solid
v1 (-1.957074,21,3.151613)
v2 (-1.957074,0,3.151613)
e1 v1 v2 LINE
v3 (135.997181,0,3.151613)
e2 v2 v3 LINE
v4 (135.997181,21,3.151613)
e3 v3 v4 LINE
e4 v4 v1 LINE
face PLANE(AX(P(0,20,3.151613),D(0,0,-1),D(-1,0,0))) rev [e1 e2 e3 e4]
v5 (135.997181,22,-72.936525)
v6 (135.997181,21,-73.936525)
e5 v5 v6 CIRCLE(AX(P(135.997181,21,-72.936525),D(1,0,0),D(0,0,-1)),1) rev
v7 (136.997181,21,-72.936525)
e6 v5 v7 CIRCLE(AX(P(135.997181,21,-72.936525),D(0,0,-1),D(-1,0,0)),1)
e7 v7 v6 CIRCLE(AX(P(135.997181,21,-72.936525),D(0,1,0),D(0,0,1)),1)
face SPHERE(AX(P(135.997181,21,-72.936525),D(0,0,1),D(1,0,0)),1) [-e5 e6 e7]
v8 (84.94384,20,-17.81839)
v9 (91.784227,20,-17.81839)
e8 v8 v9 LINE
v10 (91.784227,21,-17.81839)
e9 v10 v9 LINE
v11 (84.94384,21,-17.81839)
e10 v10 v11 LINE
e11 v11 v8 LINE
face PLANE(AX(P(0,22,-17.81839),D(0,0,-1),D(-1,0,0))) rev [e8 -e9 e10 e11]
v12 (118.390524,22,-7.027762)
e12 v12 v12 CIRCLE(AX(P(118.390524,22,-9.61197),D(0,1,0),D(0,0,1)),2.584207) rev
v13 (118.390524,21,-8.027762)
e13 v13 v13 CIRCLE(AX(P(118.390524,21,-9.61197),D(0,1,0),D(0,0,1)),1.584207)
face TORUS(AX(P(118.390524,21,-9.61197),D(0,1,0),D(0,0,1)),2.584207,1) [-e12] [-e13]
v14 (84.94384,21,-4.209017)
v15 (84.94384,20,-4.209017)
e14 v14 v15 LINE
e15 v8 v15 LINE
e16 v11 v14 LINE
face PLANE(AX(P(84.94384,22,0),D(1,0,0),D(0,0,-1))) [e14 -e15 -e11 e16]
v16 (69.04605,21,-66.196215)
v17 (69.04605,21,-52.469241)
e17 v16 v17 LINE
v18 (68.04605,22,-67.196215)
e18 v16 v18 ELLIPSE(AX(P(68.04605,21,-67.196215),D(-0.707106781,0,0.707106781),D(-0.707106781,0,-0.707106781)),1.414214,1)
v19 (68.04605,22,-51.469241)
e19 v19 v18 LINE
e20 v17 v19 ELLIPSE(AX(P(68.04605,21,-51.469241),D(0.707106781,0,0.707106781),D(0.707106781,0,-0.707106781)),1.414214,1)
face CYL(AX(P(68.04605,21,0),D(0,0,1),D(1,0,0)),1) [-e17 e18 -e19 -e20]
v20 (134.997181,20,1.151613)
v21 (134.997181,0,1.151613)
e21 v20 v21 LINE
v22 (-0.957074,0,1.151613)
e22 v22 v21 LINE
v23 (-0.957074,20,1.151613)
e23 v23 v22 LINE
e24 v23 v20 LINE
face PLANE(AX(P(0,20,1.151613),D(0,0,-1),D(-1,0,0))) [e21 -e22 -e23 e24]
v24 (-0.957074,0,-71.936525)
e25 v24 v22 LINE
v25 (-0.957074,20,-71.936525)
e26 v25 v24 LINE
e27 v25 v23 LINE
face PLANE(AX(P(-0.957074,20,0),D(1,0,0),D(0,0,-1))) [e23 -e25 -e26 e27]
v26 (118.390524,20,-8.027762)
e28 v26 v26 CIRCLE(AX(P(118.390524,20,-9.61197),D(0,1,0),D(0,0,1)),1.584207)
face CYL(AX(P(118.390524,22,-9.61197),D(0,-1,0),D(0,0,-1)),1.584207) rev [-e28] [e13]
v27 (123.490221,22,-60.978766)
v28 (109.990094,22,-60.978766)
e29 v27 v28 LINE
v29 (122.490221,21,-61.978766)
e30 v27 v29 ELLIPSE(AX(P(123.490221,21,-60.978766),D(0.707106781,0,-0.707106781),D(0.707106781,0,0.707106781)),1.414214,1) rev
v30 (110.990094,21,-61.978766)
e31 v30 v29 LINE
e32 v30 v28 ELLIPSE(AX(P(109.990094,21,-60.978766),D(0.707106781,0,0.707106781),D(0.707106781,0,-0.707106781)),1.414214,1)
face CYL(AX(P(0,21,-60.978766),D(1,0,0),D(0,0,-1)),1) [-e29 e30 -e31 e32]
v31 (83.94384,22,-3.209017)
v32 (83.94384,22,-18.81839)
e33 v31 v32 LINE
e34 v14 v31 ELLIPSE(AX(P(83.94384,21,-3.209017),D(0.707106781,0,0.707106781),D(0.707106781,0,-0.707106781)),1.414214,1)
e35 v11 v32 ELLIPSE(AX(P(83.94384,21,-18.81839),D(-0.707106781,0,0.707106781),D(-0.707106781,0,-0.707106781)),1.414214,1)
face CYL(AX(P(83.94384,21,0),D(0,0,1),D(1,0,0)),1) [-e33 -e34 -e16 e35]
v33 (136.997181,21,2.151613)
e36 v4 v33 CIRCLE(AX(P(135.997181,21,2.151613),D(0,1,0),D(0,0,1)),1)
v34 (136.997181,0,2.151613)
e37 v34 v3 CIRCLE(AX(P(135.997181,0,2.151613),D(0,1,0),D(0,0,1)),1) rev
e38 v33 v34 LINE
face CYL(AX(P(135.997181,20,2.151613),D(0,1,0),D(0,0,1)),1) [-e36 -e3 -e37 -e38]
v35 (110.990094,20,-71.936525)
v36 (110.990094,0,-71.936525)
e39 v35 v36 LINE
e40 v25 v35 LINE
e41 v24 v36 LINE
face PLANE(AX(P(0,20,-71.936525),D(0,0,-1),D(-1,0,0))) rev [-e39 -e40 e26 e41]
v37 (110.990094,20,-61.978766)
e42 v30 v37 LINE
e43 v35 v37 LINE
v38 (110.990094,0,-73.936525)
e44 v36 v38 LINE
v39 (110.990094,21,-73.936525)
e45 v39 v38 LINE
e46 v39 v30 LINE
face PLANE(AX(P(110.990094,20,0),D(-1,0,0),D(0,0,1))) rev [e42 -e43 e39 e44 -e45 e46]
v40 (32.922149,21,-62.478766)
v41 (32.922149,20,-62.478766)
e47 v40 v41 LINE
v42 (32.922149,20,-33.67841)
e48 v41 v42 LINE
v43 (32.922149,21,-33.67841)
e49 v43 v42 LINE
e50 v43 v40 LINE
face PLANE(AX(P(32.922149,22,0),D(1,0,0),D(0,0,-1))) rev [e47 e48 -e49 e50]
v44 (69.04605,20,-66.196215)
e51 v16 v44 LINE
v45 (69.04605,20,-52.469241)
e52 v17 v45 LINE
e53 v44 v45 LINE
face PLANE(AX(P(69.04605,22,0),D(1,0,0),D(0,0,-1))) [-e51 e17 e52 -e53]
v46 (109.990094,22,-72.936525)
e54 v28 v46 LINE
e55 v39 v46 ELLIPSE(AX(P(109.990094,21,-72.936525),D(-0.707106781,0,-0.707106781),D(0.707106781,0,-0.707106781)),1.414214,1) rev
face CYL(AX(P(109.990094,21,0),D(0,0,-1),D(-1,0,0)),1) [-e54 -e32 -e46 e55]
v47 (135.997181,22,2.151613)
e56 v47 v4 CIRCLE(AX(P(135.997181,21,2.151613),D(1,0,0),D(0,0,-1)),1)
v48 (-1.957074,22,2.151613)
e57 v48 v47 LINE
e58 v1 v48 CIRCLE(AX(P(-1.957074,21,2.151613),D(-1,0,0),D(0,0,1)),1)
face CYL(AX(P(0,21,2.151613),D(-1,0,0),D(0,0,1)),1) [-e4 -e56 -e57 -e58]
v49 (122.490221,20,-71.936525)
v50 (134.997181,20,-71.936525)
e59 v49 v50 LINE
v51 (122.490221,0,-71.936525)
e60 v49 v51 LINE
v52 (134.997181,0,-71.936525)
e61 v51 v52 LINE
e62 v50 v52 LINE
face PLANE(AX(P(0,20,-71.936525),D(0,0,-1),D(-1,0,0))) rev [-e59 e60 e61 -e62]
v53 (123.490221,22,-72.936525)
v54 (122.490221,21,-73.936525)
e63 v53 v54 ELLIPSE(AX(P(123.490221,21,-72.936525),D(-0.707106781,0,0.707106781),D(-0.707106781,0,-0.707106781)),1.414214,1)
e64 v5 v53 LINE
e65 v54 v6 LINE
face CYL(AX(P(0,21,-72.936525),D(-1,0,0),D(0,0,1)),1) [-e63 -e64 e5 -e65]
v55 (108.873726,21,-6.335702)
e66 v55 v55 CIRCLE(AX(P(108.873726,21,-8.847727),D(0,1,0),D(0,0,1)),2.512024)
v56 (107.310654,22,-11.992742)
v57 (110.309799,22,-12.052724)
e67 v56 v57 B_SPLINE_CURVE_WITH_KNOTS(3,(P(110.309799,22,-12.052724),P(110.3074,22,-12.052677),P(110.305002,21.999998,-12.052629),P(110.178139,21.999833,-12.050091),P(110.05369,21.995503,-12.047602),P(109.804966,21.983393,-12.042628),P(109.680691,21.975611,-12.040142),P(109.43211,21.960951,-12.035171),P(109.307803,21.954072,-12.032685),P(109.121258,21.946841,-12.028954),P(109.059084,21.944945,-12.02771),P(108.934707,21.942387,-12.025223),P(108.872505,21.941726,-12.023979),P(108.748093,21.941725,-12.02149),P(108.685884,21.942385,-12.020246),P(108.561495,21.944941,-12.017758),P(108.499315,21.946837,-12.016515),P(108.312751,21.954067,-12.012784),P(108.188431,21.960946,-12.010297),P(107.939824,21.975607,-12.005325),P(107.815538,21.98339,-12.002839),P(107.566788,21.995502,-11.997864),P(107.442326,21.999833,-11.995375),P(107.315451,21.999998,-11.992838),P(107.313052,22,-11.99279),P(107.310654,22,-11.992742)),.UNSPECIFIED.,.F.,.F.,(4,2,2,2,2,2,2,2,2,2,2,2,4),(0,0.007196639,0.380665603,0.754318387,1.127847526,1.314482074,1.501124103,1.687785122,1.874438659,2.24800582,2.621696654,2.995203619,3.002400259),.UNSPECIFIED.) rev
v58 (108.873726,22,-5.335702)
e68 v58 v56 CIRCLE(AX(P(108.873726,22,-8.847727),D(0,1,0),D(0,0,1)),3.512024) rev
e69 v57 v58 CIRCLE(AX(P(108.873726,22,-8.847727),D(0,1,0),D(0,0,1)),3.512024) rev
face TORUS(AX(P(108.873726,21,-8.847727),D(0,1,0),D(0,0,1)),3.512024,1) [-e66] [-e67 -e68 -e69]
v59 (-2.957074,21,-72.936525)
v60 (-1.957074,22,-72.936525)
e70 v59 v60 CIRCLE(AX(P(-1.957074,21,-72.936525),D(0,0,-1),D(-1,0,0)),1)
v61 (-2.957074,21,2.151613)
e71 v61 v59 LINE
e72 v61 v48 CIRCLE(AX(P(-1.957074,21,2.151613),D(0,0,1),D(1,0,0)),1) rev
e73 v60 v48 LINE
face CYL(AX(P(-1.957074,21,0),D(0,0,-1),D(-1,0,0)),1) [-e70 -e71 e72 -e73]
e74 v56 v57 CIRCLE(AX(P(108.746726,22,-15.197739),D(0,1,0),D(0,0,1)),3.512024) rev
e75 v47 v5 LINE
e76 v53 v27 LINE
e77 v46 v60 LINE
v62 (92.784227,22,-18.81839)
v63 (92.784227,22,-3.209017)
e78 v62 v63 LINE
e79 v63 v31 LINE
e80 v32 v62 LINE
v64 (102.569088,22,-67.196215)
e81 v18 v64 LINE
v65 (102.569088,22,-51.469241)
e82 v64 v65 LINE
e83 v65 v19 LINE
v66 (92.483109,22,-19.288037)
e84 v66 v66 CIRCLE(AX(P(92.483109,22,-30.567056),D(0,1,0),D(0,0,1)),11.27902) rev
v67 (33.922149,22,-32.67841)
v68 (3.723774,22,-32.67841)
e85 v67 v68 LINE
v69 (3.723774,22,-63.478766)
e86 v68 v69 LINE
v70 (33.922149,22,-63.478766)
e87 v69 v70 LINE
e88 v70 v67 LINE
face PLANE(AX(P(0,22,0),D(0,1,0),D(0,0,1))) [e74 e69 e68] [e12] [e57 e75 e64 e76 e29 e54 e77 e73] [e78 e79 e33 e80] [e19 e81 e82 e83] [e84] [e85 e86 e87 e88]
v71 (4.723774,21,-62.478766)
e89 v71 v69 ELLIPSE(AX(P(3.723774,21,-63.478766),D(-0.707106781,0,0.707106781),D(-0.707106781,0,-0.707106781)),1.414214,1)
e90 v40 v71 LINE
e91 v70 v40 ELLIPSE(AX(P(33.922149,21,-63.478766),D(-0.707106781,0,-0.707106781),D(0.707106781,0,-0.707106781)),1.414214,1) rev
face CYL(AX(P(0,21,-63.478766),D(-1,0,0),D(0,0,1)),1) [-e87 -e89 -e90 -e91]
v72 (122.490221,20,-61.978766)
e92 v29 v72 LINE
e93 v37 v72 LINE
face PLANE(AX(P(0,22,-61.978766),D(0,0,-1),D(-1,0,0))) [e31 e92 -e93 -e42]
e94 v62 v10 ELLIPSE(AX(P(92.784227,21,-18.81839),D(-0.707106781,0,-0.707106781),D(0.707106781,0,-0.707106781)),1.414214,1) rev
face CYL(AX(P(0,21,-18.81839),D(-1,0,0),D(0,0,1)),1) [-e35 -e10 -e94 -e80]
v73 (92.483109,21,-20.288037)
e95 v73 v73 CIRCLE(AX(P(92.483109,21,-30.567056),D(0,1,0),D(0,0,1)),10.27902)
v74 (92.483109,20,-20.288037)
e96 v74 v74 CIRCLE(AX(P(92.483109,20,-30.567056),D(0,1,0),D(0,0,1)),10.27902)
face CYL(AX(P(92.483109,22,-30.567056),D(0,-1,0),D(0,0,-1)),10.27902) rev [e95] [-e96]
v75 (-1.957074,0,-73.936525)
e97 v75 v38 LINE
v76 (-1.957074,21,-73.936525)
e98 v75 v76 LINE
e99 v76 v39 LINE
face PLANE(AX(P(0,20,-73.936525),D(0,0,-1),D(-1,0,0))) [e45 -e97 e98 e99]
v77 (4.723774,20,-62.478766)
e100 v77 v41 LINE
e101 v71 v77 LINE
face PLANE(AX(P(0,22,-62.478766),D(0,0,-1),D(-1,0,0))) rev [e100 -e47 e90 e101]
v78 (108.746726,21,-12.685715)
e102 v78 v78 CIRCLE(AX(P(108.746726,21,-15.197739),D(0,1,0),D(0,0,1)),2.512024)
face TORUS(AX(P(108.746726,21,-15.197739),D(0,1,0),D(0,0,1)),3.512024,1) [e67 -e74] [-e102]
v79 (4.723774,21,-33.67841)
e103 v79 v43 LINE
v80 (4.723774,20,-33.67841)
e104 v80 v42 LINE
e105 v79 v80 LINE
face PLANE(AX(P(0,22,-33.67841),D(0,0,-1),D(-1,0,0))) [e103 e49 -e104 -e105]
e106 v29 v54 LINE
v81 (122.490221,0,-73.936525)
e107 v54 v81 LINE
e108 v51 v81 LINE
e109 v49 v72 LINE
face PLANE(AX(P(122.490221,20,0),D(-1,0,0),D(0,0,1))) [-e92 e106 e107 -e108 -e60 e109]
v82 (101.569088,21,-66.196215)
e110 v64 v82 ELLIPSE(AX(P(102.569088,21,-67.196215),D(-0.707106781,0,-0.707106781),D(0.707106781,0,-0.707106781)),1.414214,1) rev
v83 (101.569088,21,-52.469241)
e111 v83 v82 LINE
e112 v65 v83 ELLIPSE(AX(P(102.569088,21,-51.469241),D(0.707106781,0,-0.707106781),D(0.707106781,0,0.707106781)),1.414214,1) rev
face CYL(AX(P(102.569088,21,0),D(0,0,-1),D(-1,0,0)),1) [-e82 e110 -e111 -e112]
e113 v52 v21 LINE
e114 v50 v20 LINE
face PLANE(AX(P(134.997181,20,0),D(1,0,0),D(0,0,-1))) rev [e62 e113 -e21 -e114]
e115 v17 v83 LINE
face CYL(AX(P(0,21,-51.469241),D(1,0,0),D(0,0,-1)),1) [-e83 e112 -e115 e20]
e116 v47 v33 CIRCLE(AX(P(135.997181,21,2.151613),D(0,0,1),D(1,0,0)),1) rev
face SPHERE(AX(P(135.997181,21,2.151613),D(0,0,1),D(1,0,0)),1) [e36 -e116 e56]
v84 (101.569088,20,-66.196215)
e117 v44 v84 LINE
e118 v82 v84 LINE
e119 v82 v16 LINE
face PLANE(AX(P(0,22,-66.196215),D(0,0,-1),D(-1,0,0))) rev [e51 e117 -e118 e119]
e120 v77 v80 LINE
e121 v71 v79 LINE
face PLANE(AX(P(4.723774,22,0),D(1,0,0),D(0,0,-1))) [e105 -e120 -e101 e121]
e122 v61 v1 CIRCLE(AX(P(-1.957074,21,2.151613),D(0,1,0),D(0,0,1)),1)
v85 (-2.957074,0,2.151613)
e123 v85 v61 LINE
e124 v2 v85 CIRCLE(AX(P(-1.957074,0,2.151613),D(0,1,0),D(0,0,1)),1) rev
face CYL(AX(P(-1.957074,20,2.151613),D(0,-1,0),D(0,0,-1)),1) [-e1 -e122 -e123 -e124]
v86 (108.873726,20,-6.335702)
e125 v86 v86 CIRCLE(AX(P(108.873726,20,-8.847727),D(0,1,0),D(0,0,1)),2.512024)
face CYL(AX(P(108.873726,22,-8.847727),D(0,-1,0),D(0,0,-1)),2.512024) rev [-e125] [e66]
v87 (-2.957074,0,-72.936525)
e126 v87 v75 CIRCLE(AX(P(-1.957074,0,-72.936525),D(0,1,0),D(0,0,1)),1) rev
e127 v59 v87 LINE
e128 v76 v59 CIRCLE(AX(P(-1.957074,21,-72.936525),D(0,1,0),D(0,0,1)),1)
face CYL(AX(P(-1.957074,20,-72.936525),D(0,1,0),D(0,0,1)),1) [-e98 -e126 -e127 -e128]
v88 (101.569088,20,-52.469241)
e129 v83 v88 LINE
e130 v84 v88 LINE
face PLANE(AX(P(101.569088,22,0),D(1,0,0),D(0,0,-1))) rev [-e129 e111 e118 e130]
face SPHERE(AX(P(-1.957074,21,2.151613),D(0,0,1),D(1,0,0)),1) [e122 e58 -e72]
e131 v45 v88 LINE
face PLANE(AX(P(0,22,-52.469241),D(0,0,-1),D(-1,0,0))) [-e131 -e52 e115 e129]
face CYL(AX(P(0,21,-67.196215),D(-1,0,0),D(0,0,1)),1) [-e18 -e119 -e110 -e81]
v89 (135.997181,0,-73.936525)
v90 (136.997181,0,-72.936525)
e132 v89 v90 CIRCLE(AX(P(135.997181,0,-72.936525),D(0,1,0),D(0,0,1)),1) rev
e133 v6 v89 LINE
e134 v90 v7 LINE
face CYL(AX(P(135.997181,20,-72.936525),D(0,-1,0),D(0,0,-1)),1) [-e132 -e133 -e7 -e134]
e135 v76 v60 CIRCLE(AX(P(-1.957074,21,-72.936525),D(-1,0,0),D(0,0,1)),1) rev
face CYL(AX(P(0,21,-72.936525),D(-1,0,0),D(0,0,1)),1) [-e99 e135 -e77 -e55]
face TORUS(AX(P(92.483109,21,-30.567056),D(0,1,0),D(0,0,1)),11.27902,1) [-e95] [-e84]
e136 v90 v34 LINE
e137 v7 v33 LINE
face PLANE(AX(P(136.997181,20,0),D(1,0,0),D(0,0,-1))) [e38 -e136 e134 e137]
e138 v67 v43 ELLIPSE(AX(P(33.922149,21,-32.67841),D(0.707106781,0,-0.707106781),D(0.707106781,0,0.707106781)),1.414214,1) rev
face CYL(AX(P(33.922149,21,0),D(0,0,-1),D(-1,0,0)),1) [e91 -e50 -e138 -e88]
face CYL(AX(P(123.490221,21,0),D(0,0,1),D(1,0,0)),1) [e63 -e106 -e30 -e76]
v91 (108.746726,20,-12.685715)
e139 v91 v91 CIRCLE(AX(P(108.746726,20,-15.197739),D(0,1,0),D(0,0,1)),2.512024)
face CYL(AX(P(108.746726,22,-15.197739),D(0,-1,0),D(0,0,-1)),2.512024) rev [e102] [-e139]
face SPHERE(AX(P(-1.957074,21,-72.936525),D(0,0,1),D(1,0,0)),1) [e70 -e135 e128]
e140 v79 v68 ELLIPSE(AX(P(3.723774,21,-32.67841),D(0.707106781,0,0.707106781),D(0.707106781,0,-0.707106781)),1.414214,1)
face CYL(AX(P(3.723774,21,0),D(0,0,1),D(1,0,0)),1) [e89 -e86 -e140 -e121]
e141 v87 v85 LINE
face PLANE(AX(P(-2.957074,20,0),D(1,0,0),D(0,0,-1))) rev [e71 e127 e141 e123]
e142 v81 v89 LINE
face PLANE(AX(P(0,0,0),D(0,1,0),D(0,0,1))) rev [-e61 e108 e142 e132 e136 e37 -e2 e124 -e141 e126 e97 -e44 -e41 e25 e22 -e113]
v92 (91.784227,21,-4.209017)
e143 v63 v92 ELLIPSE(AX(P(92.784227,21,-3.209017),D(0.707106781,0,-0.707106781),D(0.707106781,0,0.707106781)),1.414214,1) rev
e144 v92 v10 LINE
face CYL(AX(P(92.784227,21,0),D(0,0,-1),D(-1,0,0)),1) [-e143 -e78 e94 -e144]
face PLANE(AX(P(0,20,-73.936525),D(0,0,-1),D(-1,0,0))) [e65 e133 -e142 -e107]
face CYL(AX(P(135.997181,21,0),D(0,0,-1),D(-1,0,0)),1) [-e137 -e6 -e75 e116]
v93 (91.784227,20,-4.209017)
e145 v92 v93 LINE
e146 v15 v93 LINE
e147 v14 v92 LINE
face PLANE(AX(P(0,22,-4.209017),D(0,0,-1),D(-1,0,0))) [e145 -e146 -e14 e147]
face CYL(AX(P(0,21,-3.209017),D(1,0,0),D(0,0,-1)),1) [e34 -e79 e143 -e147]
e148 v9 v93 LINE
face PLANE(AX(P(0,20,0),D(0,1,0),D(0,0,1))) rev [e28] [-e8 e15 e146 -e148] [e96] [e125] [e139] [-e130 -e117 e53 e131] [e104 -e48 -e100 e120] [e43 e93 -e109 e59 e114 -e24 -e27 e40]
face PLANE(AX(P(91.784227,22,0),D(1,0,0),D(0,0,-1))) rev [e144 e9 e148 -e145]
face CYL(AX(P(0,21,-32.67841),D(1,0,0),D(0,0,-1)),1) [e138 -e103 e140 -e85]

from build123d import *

# Parameters (mm, degrees)
BOSS_EXTRUDE3_DEPTH = 20
SKETCH5_W           = 6.84038608
SKETCH5_H           = 13.609372619
SKETCH5_R           = 2.512024295
SKETCH5_R_2         = 1.584207127
SKETCH5_R_3         = 10.279019558
SKETCH5_W_2         = 28.198374396
SKETCH5_H_2         = 28.800355601
SKETCH5_W_3         = 32.523037846
SKETCH5_H_3         = 13.726974854
BOSS_EXTRUDE4_DEPTH = 2
FILLET3_R           = 1


with BuildPart() as part:
    # Sketch2 → Boss-Extrude3 (new body)
    with BuildSketch(Plane(origin=(0, 0, 0), x_dir=(1, 0, 0), z_dir=(0, 1, 0))):
        Polygon((110.99009398, 73.936525273), (-2.957073914, 73.936525273), (-2.957073914, -3.151612903), (136.997180594, -3.151612903), (136.997180594, 73.936525273), (122.49022098, 73.936525273), (122.49022098, 71.936525273), (134.997180594, 71.936525273), (134.997180594, -1.151612903), (-0.957073914, -1.151612903), (-0.957073914, 71.936525273), (110.99009398, 71.936525273), align=None)
    extrude(amount=BOSS_EXTRUDE3_DEPTH)

    # Sketch5 → Boss-Extrude4 (add)
    # profile 1 of 2: a face of its own
    with BuildSketch(Plane(origin=(0, 20, 0), x_dir=(1, 0, 0), z_dir=(0, 1, 0))):
        Polygon((110.99009398, 61.978765558), (110.99009398, 71.936525273), (-0.957073914, 71.936525273), (-0.957073914, -1.151612903), (134.997180594, -1.151612903), (134.997180594, 71.936525273), (122.49022098, 71.936525273), (122.49022098, 61.978765558), align=None)
        with Locations((88.364033528, 11.013703328)):
            Rectangle(SKETCH5_W, SKETCH5_H, mode=Mode.SUBTRACT)
        with Locations(Location((108.873726401, 8.847726695, 0), (0, 0, 270))):
            Circle(SKETCH5_R, mode=Mode.SUBTRACT)
        with Locations(Location((118.390524318, 9.61196952, 0), (0, 0, 270))):
            Circle(SKETCH5_R_2, mode=Mode.SUBTRACT)
        with Locations(Location((108.746726147, 15.197739395, 0), (0, 0, 270))):
            Circle(SKETCH5_R, mode=Mode.SUBTRACT)
        with Locations(Location((92.483108966, 30.567056134, 0), (0, 0, 270))):
            Circle(SKETCH5_R_3, mode=Mode.SUBTRACT)
        with Locations((18.822961646, 48.078587758)):
            Rectangle(SKETCH5_W_2, SKETCH5_H_2, mode=Mode.SUBTRACT)
        with Locations((85.307569215, 59.332727965)):
            Rectangle(SKETCH5_W_3, SKETCH5_H_3, mode=Mode.SUBTRACT)
    # profile 2 of 2: a face of its own
    with BuildSketch(Plane(origin=(0, 20, 0), x_dir=(1, 0, 0), z_dir=(0, 1, 0))):
        Polygon((136.997180594, 73.936525273), (122.49022098, 73.936525273), (122.49022098, 71.936525273), (134.997180594, 71.936525273), (134.997180594, -1.151612903), (-0.957073914, -1.151612903), (-0.957073914, 71.936525273), (110.99009398, 71.936525273), (110.99009398, 73.936525273), (-2.957073914, 73.936525273), (-2.957073914, -3.151612903), (136.997180594, -3.151612903), align=None)
    extrude(amount=BOSS_EXTRUDE4_DEPTH)

    # Fillet3
    # the kernel refuses this fillet: 1 mm, written as the material it takes off along each edge
    with BuildSketch(Plane(origin=(135.997180594, 21, -72.936525273), x_dir=(1, 0, 0), z_dir=(0, 0, -1))) as fillet3_piece_1_section:
        Polygon((0, 0), (FILLET3_R, 0), (FILLET3_R, -FILLET3_R), (0, -FILLET3_R), align=None)
    fillet3_piece_1 = extrude(amount=FILLET3_R, mode=Mode.PRIVATE)
    fillet3_piece_1 = fillet3_piece_1 - Plane(origin=(135.997180594, 21, -72.936525273), x_dir=(-0.7071067811865475, -0.7071067811865475, 0), z_dir=(0, 0, -1)) * Sphere(FILLET3_R, mode=Mode.PRIVATE)
    add(fillet3_piece_1, mode=Mode.SUBTRACT)
    with BuildSketch(Plane(origin=(135.997180594, 21, 2.151612903), x_dir=(0, 0, 1), z_dir=(1, 0, 0))) as fillet3_piece_2_section:
        Polygon((0, 0), (FILLET3_R, 0), (FILLET3_R, -FILLET3_R), (0, -FILLET3_R), align=None)
    fillet3_piece_2 = extrude(amount=FILLET3_R, mode=Mode.PRIVATE)
    fillet3_piece_2 = fillet3_piece_2 - Plane(origin=(135.997180594, 21, 2.151612903), x_dir=(0, -0.7071067811865475, -0.7071067811865475), z_dir=(1, 0, 0)) * Sphere(FILLET3_R, mode=Mode.PRIVATE)
    add(fillet3_piece_2, mode=Mode.SUBTRACT)
    with BuildSketch(Plane(origin=(-1.957073914, 21, 2.151612903), x_dir=(-1, 0, 0), z_dir=(0, 0, 1))) as fillet3_piece_3_section:
        Polygon((0, 0), (FILLET3_R, 0), (FILLET3_R, -FILLET3_R), (0, -FILLET3_R), align=None)
    fillet3_piece_3 = extrude(amount=FILLET3_R, mode=Mode.PRIVATE)
    fillet3_piece_3 = fillet3_piece_3 - Plane(origin=(-1.957073914, 21, 2.151612903), x_dir=(0.7071067811865475, -0.7071067811865475, 0), z_dir=(0, 0, 1)) * Sphere(FILLET3_R, mode=Mode.PRIVATE)
    add(fillet3_piece_3, mode=Mode.SUBTRACT)
    with BuildSketch(Plane(origin=(-1.957073914, 21, -72.936525273), x_dir=(-1, 0, 0), z_dir=(0, 0, -1))) as fillet3_piece_4_section:
        Polygon((0, 0), (FILLET3_R, 0), (FILLET3_R, FILLET3_R), (0, FILLET3_R), align=None)
    fillet3_piece_4 = extrude(amount=FILLET3_R, mode=Mode.PRIVATE)
    fillet3_piece_4 = fillet3_piece_4 - Plane(origin=(-1.957073914, 21, -72.936525273), x_dir=(0.7071067811865475, -0.7071067811865475, 0), z_dir=(0, 0, -1)) * Sphere(FILLET3_R, mode=Mode.PRIVATE)
    add(fillet3_piece_4, mode=Mode.SUBTRACT)
    with BuildSketch(Plane(origin=(136.997180594, -2.5, -73.936525273), x_dir=(-1, 0, 0), z_dir=(0, 1, 0)), Plane(origin=(136.997180594, -2.5, 3.151612903), x_dir=(0, 0, -1), z_dir=(0, 1, 0)), Plane(origin=(-2.957073914, -2.5, 3.151612903), x_dir=(1, 0, 0), z_dir=(0, 1, 0))) as fillet3_piece_5:
        with BuildLine():
            CenterArc((FILLET3_R, FILLET3_R), FILLET3_R, 180, 90)
            Line((0, FILLET3_R), (0, 0))
            Line((0, 0), (FILLET3_R, 0))
        make_face()
    extrude(amount=23.5, mode=Mode.SUBTRACT)
    with BuildSketch(Plane(origin=(-2.957073914, -2.5, -73.936525273), x_dir=(1, 0, 0), z_dir=(0, 1, 0))) as fillet3_piece_6:
        with BuildLine():
            CenterArc((FILLET3_R, -FILLET3_R), FILLET3_R, 90, 90)
            Line((0, -FILLET3_R), (0, 0))
            Line((0, 0), (FILLET3_R, 0))
        make_face()
    extrude(amount=23.5, mode=Mode.SUBTRACT)
    with BuildSketch(Plane(origin=(69.046050292, 22, -52.469240538), x_dir=(0, -1, 0), z_dir=(0, 0, -1)), Plane(origin=(101.569088138, 22, -66.196215392), x_dir=(0, -1, 0), z_dir=(0, 0, 1))) as fillet3_piece_7:
        with BuildLine():
            CenterArc((FILLET3_R, FILLET3_R), FILLET3_R, 180, 90)
            Line((0, FILLET3_R), (0, 0))
            Line((0, 0), (FILLET3_R, 0))
        make_face()
    extrude(amount=13.726974854, mode=Mode.SUBTRACT)
    with BuildSketch(Plane(origin=(4.723774448, 22, -33.678409957), x_dir=(0, -1, 0), z_dir=(0, 0, -1)), Plane(origin=(32.922148844, 22, -62.478765558), x_dir=(0, -1, 0), z_dir=(0, 0, 1))) as fillet3_piece_8:
        with BuildLine():
            CenterArc((FILLET3_R, FILLET3_R), FILLET3_R, 180, 90)
            Line((0, FILLET3_R), (0, 0))
            Line((0, 0), (FILLET3_R, 0))
        make_face()
    extrude(amount=28.800355601, mode=Mode.SUBTRACT)
    with BuildSketch(Plane(origin=(84.943840488, 22, -4.209017018), x_dir=(0, -1, 0), z_dir=(0, 0, -1)), Plane(origin=(91.784226568, 22, -17.818389637), x_dir=(0, -1, 0), z_dir=(0, 0, 1))) as fillet3_piece_9:
        with BuildLine():
            CenterArc((FILLET3_R, FILLET3_R), FILLET3_R, 180, 90)
            Line((0, FILLET3_R), (0, 0))
            Line((0, 0), (FILLET3_R, 0))
        make_face()
    extrude(amount=13.609372619, mode=Mode.SUBTRACT)
    with BuildSketch(Plane(origin=(110.99009398, 22, -76.436525273), x_dir=(-1, 0, 0), z_dir=(0, 0, 1)), Plane(origin=(122.49022098, 22, -76.436525273), x_dir=(0, -1, 0), z_dir=(0, 0, 1))) as fillet3_piece_10:
        with BuildLine():
            CenterArc((FILLET3_R, FILLET3_R), FILLET3_R, 180, 90)
            Line((0, FILLET3_R), (0, 0))
            Line((0, 0), (FILLET3_R, 0))
        make_face()
    extrude(amount=14.457759716, mode=Mode.SUBTRACT)
    with BuildSketch(Plane(origin=(32.922148844, 22, -33.678409957), x_dir=(0, -1, 0), z_dir=(-1, 0, 0)), Plane(origin=(4.723774448, 22, -62.478765558), x_dir=(0, -1, 0), z_dir=(1, 0, 0))) as fillet3_piece_11:
        with BuildLine():
            CenterArc((FILLET3_R, FILLET3_R), FILLET3_R, 180, 90)
            Line((0, FILLET3_R), (0, 0))
            Line((0, 0), (FILLET3_R, 0))
        make_face()
    extrude(amount=28.198374397, mode=Mode.SUBTRACT)
    with BuildSketch(Plane(origin=(91.784226568, 22, -4.209017018), x_dir=(0, -1, 0), z_dir=(-1, 0, 0)), Plane(origin=(84.943840488, 22, -17.818389637), x_dir=(0, -1, 0), z_dir=(1, 0, 0))) as fillet3_piece_12:
        with BuildLine():
            CenterArc((FILLET3_R, FILLET3_R), FILLET3_R, 180, 90)
            Line((0, FILLET3_R), (0, 0))
            Line((0, 0), (FILLET3_R, 0))
        make_face()
    extrude(amount=6.840386081, mode=Mode.SUBTRACT)
    with BuildSketch(Plane(origin=(118.390524318, 22, -9.61196952), x_dir=(0, 0, 1), z_dir=(-1, 0, 0))) as fillet3_piece_13:
        with BuildLine():
            CenterArc((1.584207127 + FILLET3_R, -FILLET3_R), FILLET3_R, 90, 90)
            Line((1.584207127 + FILLET3_R, 0), (1.584207127, 0))
            Line((1.584207127, 0), (1.584207127, -FILLET3_R))
        make_face()
    revolve(axis=Axis((118.390524318, 22, -9.61196952), (0, 1, 0)), mode=Mode.SUBTRACT)
    with BuildSketch(Plane(origin=(92.483108966, 22, -30.567056134), x_dir=(0, 0, 1), z_dir=(-1, 0, 0))) as fillet3_piece_14:
        with BuildLine():
            CenterArc((10.279019558 + FILLET3_R, -FILLET3_R), FILLET3_R, 90, 90)
            Line((10.279019558 + FILLET3_R, 0), (10.279019558, 0))
            Line((10.279019558, 0), (10.279019558, -FILLET3_R))
        make_face()
    revolve(axis=Axis((92.483108966, 22, -30.567056134), (0, 1, 0)), mode=Mode.SUBTRACT)
    with BuildSketch(Plane(origin=(108.746726147, 22, -15.197739395), x_dir=(0, 0, 1), z_dir=(-1, 0, 0))) as fillet3_piece_15:
        with BuildLine():
            CenterArc((2.512024295 + FILLET3_R, -FILLET3_R), FILLET3_R, 90, 90)
            Line((2.512024295 + FILLET3_R, 0), (2.512024295, 0))
            Line((2.512024295, 0), (2.512024295, -FILLET3_R))
        make_face()
    revolve(axis=Axis((108.746726147, 22, -15.197739395), (0, 1, 0)), mode=Mode.SUBTRACT)
    with BuildSketch(Plane(origin=(108.873726401, 22, -8.847726695), x_dir=(0, 0, 1), z_dir=(-1, 0, 0))) as fillet3_piece_16:
        with BuildLine():
            CenterArc((2.512024295 + FILLET3_R, -FILLET3_R), FILLET3_R, 90, 90)
            Line((2.512024295 + FILLET3_R, 0), (2.512024295, 0))
            Line((2.512024295, 0), (2.512024295, -FILLET3_R))
        make_face()
    revolve(axis=Axis((108.873726401, 22, -8.847726695), (0, 1, 0)), mode=Mode.SUBTRACT)
    with BuildSketch(Plane(origin=(122.49022098, 22, -61.978765558), x_dir=(0, -1, 0), z_dir=(-1, 0, 0))) as fillet3_piece_17:
        with BuildLine():
            CenterArc((FILLET3_R, FILLET3_R), FILLET3_R, 180, 90)
            Line((0, FILLET3_R), (0, 0))
            Line((0, 0), (FILLET3_R, 0))
        make_face()
    extrude(amount=11.500127, mode=Mode.SUBTRACT)
    with BuildSketch(Plane(origin=(101.569088138, 22, -52.469240538), x_dir=(0, -1, 0), z_dir=(-1, 0, 0)), Plane(origin=(69.046050292, 22, -66.196215392), x_dir=(0, -1, 0), z_dir=(1, 0, 0))) as fillet3_piece_18:
        with BuildLine():
            CenterArc((FILLET3_R, FILLET3_R), FILLET3_R, 180, 90)
            Line((0, FILLET3_R), (0, 0))
            Line((0, 0), (FILLET3_R, 0))
        make_face()
    extrude(amount=32.523037846, mode=Mode.SUBTRACT)
    with BuildSketch(Plane(origin=(113.49009398, 22, -73.936525273), x_dir=(0, -1, 0), z_dir=(-1, 0, 0))) as fillet3_piece_19:
        with BuildLine():
            CenterArc((FILLET3_R, FILLET3_R), FILLET3_R, 180, 90)
            Line((0, FILLET3_R), (0, 0))
            Line((0, 0), (FILLET3_R, 0))
        make_face()
    extrude(amount=115.447167894, mode=Mode.SUBTRACT)
    with BuildSketch(Plane(origin=(-2.957073914, 22, -72.936525273), x_dir=(0, -1, 0), z_dir=(0, 0, 1)), Plane(origin=(136.997180594, 22, 2.151612903), x_dir=(0, -1, 0), z_dir=(0, 0, -1))) as fillet3_piece_20:
        with BuildLine():
            CenterArc((FILLET3_R, FILLET3_R), FILLET3_R, 180, 90)
            Line((0, FILLET3_R), (0, 0))
            Line((0, 0), (FILLET3_R, 0))
        make_face()
    extrude(amount=75.088138176, mode=Mode.SUBTRACT)
    with BuildSketch(Plane(origin=(-1.957073914, 22, 3.151612903), x_dir=(0, -1, 0), z_dir=(1, 0, 0))) as fillet3_piece_21:
        with BuildLine():
            CenterArc((FILLET3_R, FILLET3_R), FILLET3_R, 180, 90)
            Line((0, FILLET3_R), (0, 0))
            Line((0, 0), (FILLET3_R, 0))
        make_face()
    extrude(amount=137.954254509, mode=Mode.SUBTRACT)
    with BuildSketch(Plane(origin=(135.997180594, 22, -73.936525273), x_dir=(0, -1, 0), z_dir=(-1, 0, 0))) as fillet3_piece_22:
        with BuildLine():
            CenterArc((FILLET3_R, FILLET3_R), FILLET3_R, 180, 90)
            Line((0, FILLET3_R), (0, 0))
            Line((0, 0), (FILLET3_R, 0))
        make_face()
    extrude(amount=16.006959614, mode=Mode.SUBTRACT)
    with BuildSketch(Plane(origin=(101.569088138, 22, -52.469240538), x_dir=(0, -1, 0), z_dir=(-1, 0, 0))) as fillet3_piece_23a_section:
        with BuildLine():
            CenterArc((FILLET3_R, FILLET3_R), FILLET3_R, 180, 90)
            Line((0, FILLET3_R), (0, 0))
            Line((0, 0), (FILLET3_R, 0))
        make_face()
    fillet3_piece_23a = extrude(amount=35.023037846, mode=Mode.PRIVATE)
    fillet3_piece_23a = split(fillet3_piece_23a, bisect_by=Plane(origin=(69.046050292, 21.773604886, -52.242845424), z_dir=(-1, 0, 0)), keep=Keep.TOP, mode=Mode.PRIVATE)
    with BuildSketch(Plane(origin=(69.046050292, 22, -49.969240538), x_dir=(0, -1, 0), z_dir=(0, 0, -1))) as fillet3_piece_23b_section:
        with BuildLine():
            CenterArc((FILLET3_R, FILLET3_R), FILLET3_R, 180, 90)
            Line((0, FILLET3_R), (0, 0))
            Line((0, 0), (FILLET3_R, 0))
        make_face()
    fillet3_piece_23b = extrude(amount=16.226974854, mode=Mode.PRIVATE)
    fillet3_piece_23b = split(fillet3_piece_23b, bisect_by=Plane(origin=(68.819655178, 21.773604886, -52.469240538), z_dir=(0, 0, 1)), keep=Keep.TOP, mode=Mode.PRIVATE)
    fillet3_piece_23 = fillet3_piece_23a & fillet3_piece_23b
    add(fillet3_piece_23, mode=Mode.SUBTRACT)
    with BuildSketch(Plane(origin=(66.546050292, 22, -66.196215392), x_dir=(0, -1, 0), z_dir=(1, 0, 0))) as fillet3_piece_24a_section:
        with BuildLine():
            CenterArc((FILLET3_R, FILLET3_R), FILLET3_R, 180, 90)
            Line((0, FILLET3_R), (0, 0))
            Line((0, 0), (FILLET3_R, 0))
        make_face()
    fillet3_piece_24a = extrude(amount=35.023037846, mode=Mode.PRIVATE)
    fillet3_piece_24a = split(fillet3_piece_24a, bisect_by=Plane(origin=(69.046050292, 21.773604886, -66.422610507), z_dir=(-1, 0, 0)), keep=Keep.TOP, mode=Mode.PRIVATE)
    with BuildSketch(Plane(origin=(69.046050292, 22, -52.469240538), x_dir=(0, -1, 0), z_dir=(0, 0, -1))) as fillet3_piece_24b_section:
        with BuildLine():
            CenterArc((FILLET3_R, FILLET3_R), FILLET3_R, 180, 90)
            Line((0, FILLET3_R), (0, 0))
            Line((0, 0), (FILLET3_R, 0))
        make_face()
    fillet3_piece_24b = extrude(amount=16.226974854, mode=Mode.PRIVATE)
    fillet3_piece_24b = split(fillet3_piece_24b, bisect_by=Plane(origin=(68.819655178, 21.773604886, -66.196215392), z_dir=(0, 0, -1)), keep=Keep.TOP, mode=Mode.PRIVATE)
    fillet3_piece_24 = fillet3_piece_24a & fillet3_piece_24b
    add(fillet3_piece_24, mode=Mode.SUBTRACT)
    with BuildSketch(Plane(origin=(32.922148844, 22, -33.678409957), x_dir=(0, -1, 0), z_dir=(-1, 0, 0))) as fillet3_piece_25a_section:
        with BuildLine():
            CenterArc((FILLET3_R, FILLET3_R), FILLET3_R, 180, 90)
            Line((0, FILLET3_R), (0, 0))
            Line((0, 0), (FILLET3_R, 0))
        make_face()
    fillet3_piece_25a = extrude(amount=30.698374397, mode=Mode.PRIVATE)
    fillet3_piece_25a = split(fillet3_piece_25a, bisect_by=Plane(origin=(4.723774448, 21.773604886, -33.452014843), z_dir=(-1, 0, 0)), keep=Keep.TOP, mode=Mode.PRIVATE)
    with BuildSketch(Plane(origin=(4.723774448, 22, -31.178409957), x_dir=(0, -1, 0), z_dir=(0, 0, -1))) as fillet3_piece_25b_section:
        with BuildLine():
            CenterArc((FILLET3_R, FILLET3_R), FILLET3_R, 180, 90)
            Line((0, FILLET3_R), (0, 0))
            Line((0, 0), (FILLET3_R, 0))
        make_face()
    fillet3_piece_25b = extrude(amount=31.300355601, mode=Mode.PRIVATE)
    fillet3_piece_25b = split(fillet3_piece_25b, bisect_by=Plane(origin=(4.497379333, 21.773604886, -33.678409957), z_dir=(0, 0, 1)), keep=Keep.TOP, mode=Mode.PRIVATE)
    fillet3_piece_25 = fillet3_piece_25a & fillet3_piece_25b
    add(fillet3_piece_25, mode=Mode.SUBTRACT)
    with BuildSketch(Plane(origin=(2.223774448, 22, -62.478765558), x_dir=(0, -1, 0), z_dir=(1, 0, 0))) as fillet3_piece_26a_section:
        with BuildLine():
            CenterArc((FILLET3_R, FILLET3_R), FILLET3_R, 180, 90)
            Line((0, FILLET3_R), (0, 0))
            Line((0, 0), (FILLET3_R, 0))
        make_face()
    fillet3_piece_26a = extrude(amount=30.698374397, mode=Mode.PRIVATE)
    fillet3_piece_26a = split(fillet3_piece_26a, bisect_by=Plane(origin=(4.723774448, 21.773604886, -62.705160672), z_dir=(-1, 0, 0)), keep=Keep.TOP, mode=Mode.PRIVATE)
    with BuildSketch(Plane(origin=(4.723774448, 22, -33.678409957), x_dir=(0, -1, 0), z_dir=(0, 0, -1))) as fillet3_piece_26b_section:
        with BuildLine():
            CenterArc((FILLET3_R, FILLET3_R), FILLET3_R, 180, 90)
            Line((0, FILLET3_R), (0, 0))
            Line((0, 0), (FILLET3_R, 0))
        make_face()
    fillet3_piece_26b = extrude(amount=31.300355601, mode=Mode.PRIVATE)
    fillet3_piece_26b = split(fillet3_piece_26b, bisect_by=Plane(origin=(4.497379333, 21.773604886, -62.478765558), z_dir=(0, 0, -1)), keep=Keep.TOP, mode=Mode.PRIVATE)
    fillet3_piece_26 = fillet3_piece_26a & fillet3_piece_26b
    add(fillet3_piece_26, mode=Mode.SUBTRACT)
    with BuildSketch(Plane(origin=(91.784226568, 22, -4.209017018), x_dir=(0, -1, 0), z_dir=(-1, 0, 0))) as fillet3_piece_27a_section:
        with BuildLine():
            CenterArc((FILLET3_R, FILLET3_R), FILLET3_R, 180, 90)
            Line((0, FILLET3_R), (0, 0))
            Line((0, 0), (FILLET3_R, 0))
        make_face()
    fillet3_piece_27a = extrude(amount=9.340386081, mode=Mode.PRIVATE)
    fillet3_piece_27a = split(fillet3_piece_27a, bisect_by=Plane(origin=(84.943840488, 21.773604886, -3.982621904), z_dir=(-1, 0, 0)), keep=Keep.TOP, mode=Mode.PRIVATE)
    with BuildSketch(Plane(origin=(84.943840488, 22, -1.709017018), x_dir=(0, -1, 0), z_dir=(0, 0, -1))) as fillet3_piece_27b_section:
        with BuildLine():
            CenterArc((FILLET3_R, FILLET3_R), FILLET3_R, 180, 90)
            Line((0, FILLET3_R), (0, 0))
            Line((0, 0), (FILLET3_R, 0))
        make_face()
    fillet3_piece_27b = extrude(amount=16.109372619, mode=Mode.PRIVATE)
    fillet3_piece_27b = split(fillet3_piece_27b, bisect_by=Plane(origin=(84.717445373, 21.773604886, -4.209017018), z_dir=(0, 0, 1)), keep=Keep.TOP, mode=Mode.PRIVATE)
    fillet3_piece_27 = fillet3_piece_27a & fillet3_piece_27b
    add(fillet3_piece_27, mode=Mode.SUBTRACT)
    with BuildSketch(Plane(origin=(82.443840488, 22, -17.818389637), x_dir=(0, -1, 0), z_dir=(1, 0, 0))) as fillet3_piece_28a_section:
        with BuildLine():
            CenterArc((FILLET3_R, FILLET3_R), FILLET3_R, 180, 90)
            Line((0, FILLET3_R), (0, 0))
            Line((0, 0), (FILLET3_R, 0))
        make_face()
    fillet3_piece_28a = extrude(amount=9.340386081, mode=Mode.PRIVATE)
    fillet3_piece_28a = split(fillet3_piece_28a, bisect_by=Plane(origin=(84.943840488, 21.773604886, -18.044784751), z_dir=(-1, 0, 0)), keep=Keep.TOP, mode=Mode.PRIVATE)
    with BuildSketch(Plane(origin=(84.943840488, 22, -4.209017018), x_dir=(0, -1, 0), z_dir=(0, 0, -1))) as fillet3_piece_28b_section:
        with BuildLine():
            CenterArc((FILLET3_R, FILLET3_R), FILLET3_R, 180, 90)
            Line((0, FILLET3_R), (0, 0))
            Line((0, 0), (FILLET3_R, 0))
        make_face()
    fillet3_piece_28b = extrude(amount=16.109372619, mode=Mode.PRIVATE)
    fillet3_piece_28b = split(fillet3_piece_28b, bisect_by=Plane(origin=(84.717445373, 21.773604886, -17.818389637), z_dir=(0, 0, -1)), keep=Keep.TOP, mode=Mode.PRIVATE)
    fillet3_piece_28 = fillet3_piece_28a & fillet3_piece_28b
    add(fillet3_piece_28, mode=Mode.SUBTRACT)
    with BuildSketch(Plane(origin=(122.49022098, 22, -61.978765558), x_dir=(0, -1, 0), z_dir=(-1, 0, 0))) as fillet3_piece_29a_section:
        with BuildLine():
            CenterArc((FILLET3_R, FILLET3_R), FILLET3_R, 180, 90)
            Line((0, FILLET3_R), (0, 0))
            Line((0, 0), (FILLET3_R, 0))
        make_face()
    fillet3_piece_29a = extrude(amount=14.000127, mode=Mode.PRIVATE)
    fillet3_piece_29a = split(fillet3_piece_29a, bisect_by=Plane(origin=(110.99009398, 21.773604886, -61.752370443), z_dir=(-1, 0, 0)), keep=Keep.TOP, mode=Mode.PRIVATE)
    with BuildSketch(Plane(origin=(110.99009398, 22, -76.436525273), x_dir=(-1, 0, 0), z_dir=(0, 0, 1))) as fillet3_piece_29b_section:
        with BuildLine():
            CenterArc((FILLET3_R, FILLET3_R), FILLET3_R, 180, 90)
            Line((0, FILLET3_R), (0, 0))
            Line((0, 0), (FILLET3_R, 0))
        make_face()
    fillet3_piece_29b = extrude(amount=16.957759716, mode=Mode.PRIVATE)
    fillet3_piece_29b = split(fillet3_piece_29b, bisect_by=Plane(origin=(110.763698866, 21.773604886, -61.978765558), z_dir=(0, 0, 1)), keep=Keep.TOP, mode=Mode.PRIVATE)
    fillet3_piece_29 = fillet3_piece_29a & fillet3_piece_29b
    add(fillet3_piece_29, mode=Mode.SUBTRACT)
    with BuildSketch(Plane(origin=(32.922148844, 22, -62.478765558), x_dir=(0, -1, 0), z_dir=(0, 0, 1))) as fillet3_piece_30a_section:
        with BuildLine():
            CenterArc((FILLET3_R, FILLET3_R), FILLET3_R, 180, 90)
            Line((0, FILLET3_R), (0, 0))
            Line((0, 0), (FILLET3_R, 0))
        make_face()
    fillet3_piece_30a = extrude(amount=31.300355601, mode=Mode.PRIVATE)
    fillet3_piece_30a = split(fillet3_piece_30a, bisect_by=Plane(origin=(33.148543959, 21.773604886, -33.678409957), z_dir=(0, 0, 1)), keep=Keep.TOP, mode=Mode.PRIVATE)
    with BuildSketch(Plane(origin=(35.422148844, 22, -33.678409957), x_dir=(0, -1, 0), z_dir=(-1, 0, 0))) as fillet3_piece_30b_section:
        with BuildLine():
            CenterArc((FILLET3_R, FILLET3_R), FILLET3_R, 180, 90)
            Line((0, FILLET3_R), (0, 0))
            Line((0, 0), (FILLET3_R, 0))
        make_face()
    fillet3_piece_30b = extrude(amount=30.698374397, mode=Mode.PRIVATE)
    fillet3_piece_30b = split(fillet3_piece_30b, bisect_by=Plane(origin=(32.922148844, 21.773604886, -33.452014843), z_dir=(1, 0, 0)), keep=Keep.TOP, mode=Mode.PRIVATE)
    fillet3_piece_30 = fillet3_piece_30a & fillet3_piece_30b
    add(fillet3_piece_30, mode=Mode.SUBTRACT)
    with BuildSketch(Plane(origin=(91.784226568, 22, -17.818389637), x_dir=(0, -1, 0), z_dir=(0, 0, 1))) as fillet3_piece_31a_section:
        with BuildLine():
            CenterArc((FILLET3_R, FILLET3_R), FILLET3_R, 180, 90)
            Line((0, FILLET3_R), (0, 0))
            Line((0, 0), (FILLET3_R, 0))
        make_face()
    fillet3_piece_31a = extrude(amount=16.109372619, mode=Mode.PRIVATE)
    fillet3_piece_31a = split(fillet3_piece_31a, bisect_by=Plane(origin=(92.010621683, 21.773604886, -4.209017018), z_dir=(0, 0, 1)), keep=Keep.TOP, mode=Mode.PRIVATE)
    with BuildSketch(Plane(origin=(94.284226568, 22, -4.209017018), x_dir=(0, -1, 0), z_dir=(-1, 0, 0))) as fillet3_piece_31b_section:
        with BuildLine():
            CenterArc((FILLET3_R, FILLET3_R), FILLET3_R, 180, 90)
            Line((0, FILLET3_R), (0, 0))
            Line((0, 0), (FILLET3_R, 0))
        make_face()
    fillet3_piece_31b = extrude(amount=9.340386081, mode=Mode.PRIVATE)
    fillet3_piece_31b = split(fillet3_piece_31b, bisect_by=Plane(origin=(91.784226568, 21.773604886, -3.982621904), z_dir=(1, 0, 0)), keep=Keep.TOP, mode=Mode.PRIVATE)
    fillet3_piece_31 = fillet3_piece_31a & fillet3_piece_31b
    add(fillet3_piece_31, mode=Mode.SUBTRACT)
    with BuildSketch(Plane(origin=(124.99022098, 22, -61.978765558), x_dir=(0, -1, 0), z_dir=(-1, 0, 0))) as fillet3_piece_32a_section:
        with BuildLine():
            CenterArc((FILLET3_R, FILLET3_R), FILLET3_R, 180, 90)
            Line((0, FILLET3_R), (0, 0))
            Line((0, 0), (FILLET3_R, 0))
        make_face()
    fillet3_piece_32a = extrude(amount=14.000127, mode=Mode.PRIVATE)
    fillet3_piece_32a = split(fillet3_piece_32a, bisect_by=Plane(origin=(122.49022098, 21.773604886, -61.752370443), z_dir=(1, 0, 0)), keep=Keep.TOP, mode=Mode.PRIVATE)
    with BuildSketch(Plane(origin=(122.49022098, 22, -76.436525273), x_dir=(0, -1, 0), z_dir=(0, 0, 1))) as fillet3_piece_32b_section:
        with BuildLine():
            CenterArc((FILLET3_R, FILLET3_R), FILLET3_R, 180, 90)
            Line((0, FILLET3_R), (0, 0))
            Line((0, 0), (FILLET3_R, 0))
        make_face()
    fillet3_piece_32b = extrude(amount=16.957759716, mode=Mode.PRIVATE)
    fillet3_piece_32b = split(fillet3_piece_32b, bisect_by=Plane(origin=(122.716616095, 21.773604886, -61.978765558), z_dir=(0, 0, 1)), keep=Keep.TOP, mode=Mode.PRIVATE)
    fillet3_piece_32 = fillet3_piece_32a & fillet3_piece_32b
    add(fillet3_piece_32, mode=Mode.SUBTRACT)
    with BuildSketch(Plane(origin=(101.569088138, 22, -66.196215392), x_dir=(0, -1, 0), z_dir=(0, 0, 1))) as fillet3_piece_33a_section:
        with BuildLine():
            CenterArc((FILLET3_R, FILLET3_R), FILLET3_R, 180, 90)
            Line((0, FILLET3_R), (0, 0))
            Line((0, 0), (FILLET3_R, 0))
        make_face()
    fillet3_piece_33a = extrude(amount=16.226974854, mode=Mode.PRIVATE)
    fillet3_piece_33a = split(fillet3_piece_33a, bisect_by=Plane(origin=(101.795483252, 21.773604886, -52.469240538), z_dir=(0, 0, 1)), keep=Keep.TOP, mode=Mode.PRIVATE)
    with BuildSketch(Plane(origin=(104.069088138, 22, -52.469240538), x_dir=(0, -1, 0), z_dir=(-1, 0, 0))) as fillet3_piece_33b_section:
        with BuildLine():
            CenterArc((FILLET3_R, FILLET3_R), FILLET3_R, 180, 90)
            Line((0, FILLET3_R), (0, 0))
            Line((0, 0), (FILLET3_R, 0))
        make_face()
    fillet3_piece_33b = extrude(amount=35.023037846, mode=Mode.PRIVATE)
    fillet3_piece_33b = split(fillet3_piece_33b, bisect_by=Plane(origin=(101.569088138, 21.773604886, -52.242845424), z_dir=(1, 0, 0)), keep=Keep.TOP, mode=Mode.PRIVATE)
    fillet3_piece_33 = fillet3_piece_33a & fillet3_piece_33b
    add(fillet3_piece_33, mode=Mode.SUBTRACT)
    with BuildSketch(Plane(origin=(91.784226568, 22, -20.318389637), x_dir=(0, -1, 0), z_dir=(0, 0, 1))) as fillet3_piece_34a_section:
        with BuildLine():
            CenterArc((FILLET3_R, FILLET3_R), FILLET3_R, 180, 90)
            Line((0, FILLET3_R), (0, 0))
            Line((0, 0), (FILLET3_R, 0))
        make_face()
    fillet3_piece_34a = extrude(amount=16.109372619, mode=Mode.PRIVATE)
    fillet3_piece_34a = split(fillet3_piece_34a, bisect_by=Plane(origin=(92.010621683, 21.773604886, -17.818389637), z_dir=(0, 0, -1)), keep=Keep.TOP, mode=Mode.PRIVATE)
    with BuildSketch(Plane(origin=(84.943840488, 22, -17.818389637), x_dir=(0, -1, 0), z_dir=(1, 0, 0))) as fillet3_piece_34b_section:
        with BuildLine():
            CenterArc((FILLET3_R, FILLET3_R), FILLET3_R, 180, 90)
            Line((0, FILLET3_R), (0, 0))
            Line((0, 0), (FILLET3_R, 0))
        make_face()
    fillet3_piece_34b = extrude(amount=9.340386081, mode=Mode.PRIVATE)
    fillet3_piece_34b = split(fillet3_piece_34b, bisect_by=Plane(origin=(91.784226568, 21.773604886, -18.044784751), z_dir=(1, 0, 0)), keep=Keep.TOP, mode=Mode.PRIVATE)
    fillet3_piece_34 = fillet3_piece_34a & fillet3_piece_34b
    add(fillet3_piece_34, mode=Mode.SUBTRACT)
    with BuildSketch(Plane(origin=(32.922148844, 22, -64.978765558), x_dir=(0, -1, 0), z_dir=(0, 0, 1))) as fillet3_piece_35a_section:
        with BuildLine():
            CenterArc((FILLET3_R, FILLET3_R), FILLET3_R, 180, 90)
            Line((0, FILLET3_R), (0, 0))
            Line((0, 0), (FILLET3_R, 0))
        make_face()
    fillet3_piece_35a = extrude(amount=31.300355601, mode=Mode.PRIVATE)
    fillet3_piece_35a = split(fillet3_piece_35a, bisect_by=Plane(origin=(33.148543959, 21.773604886, -62.478765558), z_dir=(0, 0, -1)), keep=Keep.TOP, mode=Mode.PRIVATE)
    with BuildSketch(Plane(origin=(4.723774448, 22, -62.478765558), x_dir=(0, -1, 0), z_dir=(1, 0, 0))) as fillet3_piece_35b_section:
        with BuildLine():
            CenterArc((FILLET3_R, FILLET3_R), FILLET3_R, 180, 90)
            Line((0, FILLET3_R), (0, 0))
            Line((0, 0), (FILLET3_R, 0))
        make_face()
    fillet3_piece_35b = extrude(amount=30.698374397, mode=Mode.PRIVATE)
    fillet3_piece_35b = split(fillet3_piece_35b, bisect_by=Plane(origin=(32.922148844, 21.773604886, -62.705160672), z_dir=(1, 0, 0)), keep=Keep.TOP, mode=Mode.PRIVATE)
    fillet3_piece_35 = fillet3_piece_35a & fillet3_piece_35b
    add(fillet3_piece_35, mode=Mode.SUBTRACT)
    with BuildSketch(Plane(origin=(101.569088138, 22, -68.696215392), x_dir=(0, -1, 0), z_dir=(0, 0, 1))) as fillet3_piece_36a_section:
        with BuildLine():
            CenterArc((FILLET3_R, FILLET3_R), FILLET3_R, 180, 90)
            Line((0, FILLET3_R), (0, 0))
            Line((0, 0), (FILLET3_R, 0))
        make_face()
    fillet3_piece_36a = extrude(amount=16.226974854, mode=Mode.PRIVATE)
    fillet3_piece_36a = split(fillet3_piece_36a, bisect_by=Plane(origin=(101.795483252, 21.773604886, -66.196215392), z_dir=(0, 0, -1)), keep=Keep.TOP, mode=Mode.PRIVATE)
    with BuildSketch(Plane(origin=(69.046050292, 22, -66.196215392), x_dir=(0, -1, 0), z_dir=(1, 0, 0))) as fillet3_piece_36b_section:
        with BuildLine():
            CenterArc((FILLET3_R, FILLET3_R), FILLET3_R, 180, 90)
            Line((0, FILLET3_R), (0, 0))
            Line((0, 0), (FILLET3_R, 0))
        make_face()
    fillet3_piece_36b = extrude(amount=35.023037846, mode=Mode.PRIVATE)
    fillet3_piece_36b = split(fillet3_piece_36b, bisect_by=Plane(origin=(101.569088138, 21.773604886, -66.422610507), z_dir=(1, 0, 0)), keep=Keep.TOP, mode=Mode.PRIVATE)
    fillet3_piece_36 = fillet3_piece_36a & fillet3_piece_36b
    add(fillet3_piece_36, mode=Mode.SUBTRACT)


solid = part.part
